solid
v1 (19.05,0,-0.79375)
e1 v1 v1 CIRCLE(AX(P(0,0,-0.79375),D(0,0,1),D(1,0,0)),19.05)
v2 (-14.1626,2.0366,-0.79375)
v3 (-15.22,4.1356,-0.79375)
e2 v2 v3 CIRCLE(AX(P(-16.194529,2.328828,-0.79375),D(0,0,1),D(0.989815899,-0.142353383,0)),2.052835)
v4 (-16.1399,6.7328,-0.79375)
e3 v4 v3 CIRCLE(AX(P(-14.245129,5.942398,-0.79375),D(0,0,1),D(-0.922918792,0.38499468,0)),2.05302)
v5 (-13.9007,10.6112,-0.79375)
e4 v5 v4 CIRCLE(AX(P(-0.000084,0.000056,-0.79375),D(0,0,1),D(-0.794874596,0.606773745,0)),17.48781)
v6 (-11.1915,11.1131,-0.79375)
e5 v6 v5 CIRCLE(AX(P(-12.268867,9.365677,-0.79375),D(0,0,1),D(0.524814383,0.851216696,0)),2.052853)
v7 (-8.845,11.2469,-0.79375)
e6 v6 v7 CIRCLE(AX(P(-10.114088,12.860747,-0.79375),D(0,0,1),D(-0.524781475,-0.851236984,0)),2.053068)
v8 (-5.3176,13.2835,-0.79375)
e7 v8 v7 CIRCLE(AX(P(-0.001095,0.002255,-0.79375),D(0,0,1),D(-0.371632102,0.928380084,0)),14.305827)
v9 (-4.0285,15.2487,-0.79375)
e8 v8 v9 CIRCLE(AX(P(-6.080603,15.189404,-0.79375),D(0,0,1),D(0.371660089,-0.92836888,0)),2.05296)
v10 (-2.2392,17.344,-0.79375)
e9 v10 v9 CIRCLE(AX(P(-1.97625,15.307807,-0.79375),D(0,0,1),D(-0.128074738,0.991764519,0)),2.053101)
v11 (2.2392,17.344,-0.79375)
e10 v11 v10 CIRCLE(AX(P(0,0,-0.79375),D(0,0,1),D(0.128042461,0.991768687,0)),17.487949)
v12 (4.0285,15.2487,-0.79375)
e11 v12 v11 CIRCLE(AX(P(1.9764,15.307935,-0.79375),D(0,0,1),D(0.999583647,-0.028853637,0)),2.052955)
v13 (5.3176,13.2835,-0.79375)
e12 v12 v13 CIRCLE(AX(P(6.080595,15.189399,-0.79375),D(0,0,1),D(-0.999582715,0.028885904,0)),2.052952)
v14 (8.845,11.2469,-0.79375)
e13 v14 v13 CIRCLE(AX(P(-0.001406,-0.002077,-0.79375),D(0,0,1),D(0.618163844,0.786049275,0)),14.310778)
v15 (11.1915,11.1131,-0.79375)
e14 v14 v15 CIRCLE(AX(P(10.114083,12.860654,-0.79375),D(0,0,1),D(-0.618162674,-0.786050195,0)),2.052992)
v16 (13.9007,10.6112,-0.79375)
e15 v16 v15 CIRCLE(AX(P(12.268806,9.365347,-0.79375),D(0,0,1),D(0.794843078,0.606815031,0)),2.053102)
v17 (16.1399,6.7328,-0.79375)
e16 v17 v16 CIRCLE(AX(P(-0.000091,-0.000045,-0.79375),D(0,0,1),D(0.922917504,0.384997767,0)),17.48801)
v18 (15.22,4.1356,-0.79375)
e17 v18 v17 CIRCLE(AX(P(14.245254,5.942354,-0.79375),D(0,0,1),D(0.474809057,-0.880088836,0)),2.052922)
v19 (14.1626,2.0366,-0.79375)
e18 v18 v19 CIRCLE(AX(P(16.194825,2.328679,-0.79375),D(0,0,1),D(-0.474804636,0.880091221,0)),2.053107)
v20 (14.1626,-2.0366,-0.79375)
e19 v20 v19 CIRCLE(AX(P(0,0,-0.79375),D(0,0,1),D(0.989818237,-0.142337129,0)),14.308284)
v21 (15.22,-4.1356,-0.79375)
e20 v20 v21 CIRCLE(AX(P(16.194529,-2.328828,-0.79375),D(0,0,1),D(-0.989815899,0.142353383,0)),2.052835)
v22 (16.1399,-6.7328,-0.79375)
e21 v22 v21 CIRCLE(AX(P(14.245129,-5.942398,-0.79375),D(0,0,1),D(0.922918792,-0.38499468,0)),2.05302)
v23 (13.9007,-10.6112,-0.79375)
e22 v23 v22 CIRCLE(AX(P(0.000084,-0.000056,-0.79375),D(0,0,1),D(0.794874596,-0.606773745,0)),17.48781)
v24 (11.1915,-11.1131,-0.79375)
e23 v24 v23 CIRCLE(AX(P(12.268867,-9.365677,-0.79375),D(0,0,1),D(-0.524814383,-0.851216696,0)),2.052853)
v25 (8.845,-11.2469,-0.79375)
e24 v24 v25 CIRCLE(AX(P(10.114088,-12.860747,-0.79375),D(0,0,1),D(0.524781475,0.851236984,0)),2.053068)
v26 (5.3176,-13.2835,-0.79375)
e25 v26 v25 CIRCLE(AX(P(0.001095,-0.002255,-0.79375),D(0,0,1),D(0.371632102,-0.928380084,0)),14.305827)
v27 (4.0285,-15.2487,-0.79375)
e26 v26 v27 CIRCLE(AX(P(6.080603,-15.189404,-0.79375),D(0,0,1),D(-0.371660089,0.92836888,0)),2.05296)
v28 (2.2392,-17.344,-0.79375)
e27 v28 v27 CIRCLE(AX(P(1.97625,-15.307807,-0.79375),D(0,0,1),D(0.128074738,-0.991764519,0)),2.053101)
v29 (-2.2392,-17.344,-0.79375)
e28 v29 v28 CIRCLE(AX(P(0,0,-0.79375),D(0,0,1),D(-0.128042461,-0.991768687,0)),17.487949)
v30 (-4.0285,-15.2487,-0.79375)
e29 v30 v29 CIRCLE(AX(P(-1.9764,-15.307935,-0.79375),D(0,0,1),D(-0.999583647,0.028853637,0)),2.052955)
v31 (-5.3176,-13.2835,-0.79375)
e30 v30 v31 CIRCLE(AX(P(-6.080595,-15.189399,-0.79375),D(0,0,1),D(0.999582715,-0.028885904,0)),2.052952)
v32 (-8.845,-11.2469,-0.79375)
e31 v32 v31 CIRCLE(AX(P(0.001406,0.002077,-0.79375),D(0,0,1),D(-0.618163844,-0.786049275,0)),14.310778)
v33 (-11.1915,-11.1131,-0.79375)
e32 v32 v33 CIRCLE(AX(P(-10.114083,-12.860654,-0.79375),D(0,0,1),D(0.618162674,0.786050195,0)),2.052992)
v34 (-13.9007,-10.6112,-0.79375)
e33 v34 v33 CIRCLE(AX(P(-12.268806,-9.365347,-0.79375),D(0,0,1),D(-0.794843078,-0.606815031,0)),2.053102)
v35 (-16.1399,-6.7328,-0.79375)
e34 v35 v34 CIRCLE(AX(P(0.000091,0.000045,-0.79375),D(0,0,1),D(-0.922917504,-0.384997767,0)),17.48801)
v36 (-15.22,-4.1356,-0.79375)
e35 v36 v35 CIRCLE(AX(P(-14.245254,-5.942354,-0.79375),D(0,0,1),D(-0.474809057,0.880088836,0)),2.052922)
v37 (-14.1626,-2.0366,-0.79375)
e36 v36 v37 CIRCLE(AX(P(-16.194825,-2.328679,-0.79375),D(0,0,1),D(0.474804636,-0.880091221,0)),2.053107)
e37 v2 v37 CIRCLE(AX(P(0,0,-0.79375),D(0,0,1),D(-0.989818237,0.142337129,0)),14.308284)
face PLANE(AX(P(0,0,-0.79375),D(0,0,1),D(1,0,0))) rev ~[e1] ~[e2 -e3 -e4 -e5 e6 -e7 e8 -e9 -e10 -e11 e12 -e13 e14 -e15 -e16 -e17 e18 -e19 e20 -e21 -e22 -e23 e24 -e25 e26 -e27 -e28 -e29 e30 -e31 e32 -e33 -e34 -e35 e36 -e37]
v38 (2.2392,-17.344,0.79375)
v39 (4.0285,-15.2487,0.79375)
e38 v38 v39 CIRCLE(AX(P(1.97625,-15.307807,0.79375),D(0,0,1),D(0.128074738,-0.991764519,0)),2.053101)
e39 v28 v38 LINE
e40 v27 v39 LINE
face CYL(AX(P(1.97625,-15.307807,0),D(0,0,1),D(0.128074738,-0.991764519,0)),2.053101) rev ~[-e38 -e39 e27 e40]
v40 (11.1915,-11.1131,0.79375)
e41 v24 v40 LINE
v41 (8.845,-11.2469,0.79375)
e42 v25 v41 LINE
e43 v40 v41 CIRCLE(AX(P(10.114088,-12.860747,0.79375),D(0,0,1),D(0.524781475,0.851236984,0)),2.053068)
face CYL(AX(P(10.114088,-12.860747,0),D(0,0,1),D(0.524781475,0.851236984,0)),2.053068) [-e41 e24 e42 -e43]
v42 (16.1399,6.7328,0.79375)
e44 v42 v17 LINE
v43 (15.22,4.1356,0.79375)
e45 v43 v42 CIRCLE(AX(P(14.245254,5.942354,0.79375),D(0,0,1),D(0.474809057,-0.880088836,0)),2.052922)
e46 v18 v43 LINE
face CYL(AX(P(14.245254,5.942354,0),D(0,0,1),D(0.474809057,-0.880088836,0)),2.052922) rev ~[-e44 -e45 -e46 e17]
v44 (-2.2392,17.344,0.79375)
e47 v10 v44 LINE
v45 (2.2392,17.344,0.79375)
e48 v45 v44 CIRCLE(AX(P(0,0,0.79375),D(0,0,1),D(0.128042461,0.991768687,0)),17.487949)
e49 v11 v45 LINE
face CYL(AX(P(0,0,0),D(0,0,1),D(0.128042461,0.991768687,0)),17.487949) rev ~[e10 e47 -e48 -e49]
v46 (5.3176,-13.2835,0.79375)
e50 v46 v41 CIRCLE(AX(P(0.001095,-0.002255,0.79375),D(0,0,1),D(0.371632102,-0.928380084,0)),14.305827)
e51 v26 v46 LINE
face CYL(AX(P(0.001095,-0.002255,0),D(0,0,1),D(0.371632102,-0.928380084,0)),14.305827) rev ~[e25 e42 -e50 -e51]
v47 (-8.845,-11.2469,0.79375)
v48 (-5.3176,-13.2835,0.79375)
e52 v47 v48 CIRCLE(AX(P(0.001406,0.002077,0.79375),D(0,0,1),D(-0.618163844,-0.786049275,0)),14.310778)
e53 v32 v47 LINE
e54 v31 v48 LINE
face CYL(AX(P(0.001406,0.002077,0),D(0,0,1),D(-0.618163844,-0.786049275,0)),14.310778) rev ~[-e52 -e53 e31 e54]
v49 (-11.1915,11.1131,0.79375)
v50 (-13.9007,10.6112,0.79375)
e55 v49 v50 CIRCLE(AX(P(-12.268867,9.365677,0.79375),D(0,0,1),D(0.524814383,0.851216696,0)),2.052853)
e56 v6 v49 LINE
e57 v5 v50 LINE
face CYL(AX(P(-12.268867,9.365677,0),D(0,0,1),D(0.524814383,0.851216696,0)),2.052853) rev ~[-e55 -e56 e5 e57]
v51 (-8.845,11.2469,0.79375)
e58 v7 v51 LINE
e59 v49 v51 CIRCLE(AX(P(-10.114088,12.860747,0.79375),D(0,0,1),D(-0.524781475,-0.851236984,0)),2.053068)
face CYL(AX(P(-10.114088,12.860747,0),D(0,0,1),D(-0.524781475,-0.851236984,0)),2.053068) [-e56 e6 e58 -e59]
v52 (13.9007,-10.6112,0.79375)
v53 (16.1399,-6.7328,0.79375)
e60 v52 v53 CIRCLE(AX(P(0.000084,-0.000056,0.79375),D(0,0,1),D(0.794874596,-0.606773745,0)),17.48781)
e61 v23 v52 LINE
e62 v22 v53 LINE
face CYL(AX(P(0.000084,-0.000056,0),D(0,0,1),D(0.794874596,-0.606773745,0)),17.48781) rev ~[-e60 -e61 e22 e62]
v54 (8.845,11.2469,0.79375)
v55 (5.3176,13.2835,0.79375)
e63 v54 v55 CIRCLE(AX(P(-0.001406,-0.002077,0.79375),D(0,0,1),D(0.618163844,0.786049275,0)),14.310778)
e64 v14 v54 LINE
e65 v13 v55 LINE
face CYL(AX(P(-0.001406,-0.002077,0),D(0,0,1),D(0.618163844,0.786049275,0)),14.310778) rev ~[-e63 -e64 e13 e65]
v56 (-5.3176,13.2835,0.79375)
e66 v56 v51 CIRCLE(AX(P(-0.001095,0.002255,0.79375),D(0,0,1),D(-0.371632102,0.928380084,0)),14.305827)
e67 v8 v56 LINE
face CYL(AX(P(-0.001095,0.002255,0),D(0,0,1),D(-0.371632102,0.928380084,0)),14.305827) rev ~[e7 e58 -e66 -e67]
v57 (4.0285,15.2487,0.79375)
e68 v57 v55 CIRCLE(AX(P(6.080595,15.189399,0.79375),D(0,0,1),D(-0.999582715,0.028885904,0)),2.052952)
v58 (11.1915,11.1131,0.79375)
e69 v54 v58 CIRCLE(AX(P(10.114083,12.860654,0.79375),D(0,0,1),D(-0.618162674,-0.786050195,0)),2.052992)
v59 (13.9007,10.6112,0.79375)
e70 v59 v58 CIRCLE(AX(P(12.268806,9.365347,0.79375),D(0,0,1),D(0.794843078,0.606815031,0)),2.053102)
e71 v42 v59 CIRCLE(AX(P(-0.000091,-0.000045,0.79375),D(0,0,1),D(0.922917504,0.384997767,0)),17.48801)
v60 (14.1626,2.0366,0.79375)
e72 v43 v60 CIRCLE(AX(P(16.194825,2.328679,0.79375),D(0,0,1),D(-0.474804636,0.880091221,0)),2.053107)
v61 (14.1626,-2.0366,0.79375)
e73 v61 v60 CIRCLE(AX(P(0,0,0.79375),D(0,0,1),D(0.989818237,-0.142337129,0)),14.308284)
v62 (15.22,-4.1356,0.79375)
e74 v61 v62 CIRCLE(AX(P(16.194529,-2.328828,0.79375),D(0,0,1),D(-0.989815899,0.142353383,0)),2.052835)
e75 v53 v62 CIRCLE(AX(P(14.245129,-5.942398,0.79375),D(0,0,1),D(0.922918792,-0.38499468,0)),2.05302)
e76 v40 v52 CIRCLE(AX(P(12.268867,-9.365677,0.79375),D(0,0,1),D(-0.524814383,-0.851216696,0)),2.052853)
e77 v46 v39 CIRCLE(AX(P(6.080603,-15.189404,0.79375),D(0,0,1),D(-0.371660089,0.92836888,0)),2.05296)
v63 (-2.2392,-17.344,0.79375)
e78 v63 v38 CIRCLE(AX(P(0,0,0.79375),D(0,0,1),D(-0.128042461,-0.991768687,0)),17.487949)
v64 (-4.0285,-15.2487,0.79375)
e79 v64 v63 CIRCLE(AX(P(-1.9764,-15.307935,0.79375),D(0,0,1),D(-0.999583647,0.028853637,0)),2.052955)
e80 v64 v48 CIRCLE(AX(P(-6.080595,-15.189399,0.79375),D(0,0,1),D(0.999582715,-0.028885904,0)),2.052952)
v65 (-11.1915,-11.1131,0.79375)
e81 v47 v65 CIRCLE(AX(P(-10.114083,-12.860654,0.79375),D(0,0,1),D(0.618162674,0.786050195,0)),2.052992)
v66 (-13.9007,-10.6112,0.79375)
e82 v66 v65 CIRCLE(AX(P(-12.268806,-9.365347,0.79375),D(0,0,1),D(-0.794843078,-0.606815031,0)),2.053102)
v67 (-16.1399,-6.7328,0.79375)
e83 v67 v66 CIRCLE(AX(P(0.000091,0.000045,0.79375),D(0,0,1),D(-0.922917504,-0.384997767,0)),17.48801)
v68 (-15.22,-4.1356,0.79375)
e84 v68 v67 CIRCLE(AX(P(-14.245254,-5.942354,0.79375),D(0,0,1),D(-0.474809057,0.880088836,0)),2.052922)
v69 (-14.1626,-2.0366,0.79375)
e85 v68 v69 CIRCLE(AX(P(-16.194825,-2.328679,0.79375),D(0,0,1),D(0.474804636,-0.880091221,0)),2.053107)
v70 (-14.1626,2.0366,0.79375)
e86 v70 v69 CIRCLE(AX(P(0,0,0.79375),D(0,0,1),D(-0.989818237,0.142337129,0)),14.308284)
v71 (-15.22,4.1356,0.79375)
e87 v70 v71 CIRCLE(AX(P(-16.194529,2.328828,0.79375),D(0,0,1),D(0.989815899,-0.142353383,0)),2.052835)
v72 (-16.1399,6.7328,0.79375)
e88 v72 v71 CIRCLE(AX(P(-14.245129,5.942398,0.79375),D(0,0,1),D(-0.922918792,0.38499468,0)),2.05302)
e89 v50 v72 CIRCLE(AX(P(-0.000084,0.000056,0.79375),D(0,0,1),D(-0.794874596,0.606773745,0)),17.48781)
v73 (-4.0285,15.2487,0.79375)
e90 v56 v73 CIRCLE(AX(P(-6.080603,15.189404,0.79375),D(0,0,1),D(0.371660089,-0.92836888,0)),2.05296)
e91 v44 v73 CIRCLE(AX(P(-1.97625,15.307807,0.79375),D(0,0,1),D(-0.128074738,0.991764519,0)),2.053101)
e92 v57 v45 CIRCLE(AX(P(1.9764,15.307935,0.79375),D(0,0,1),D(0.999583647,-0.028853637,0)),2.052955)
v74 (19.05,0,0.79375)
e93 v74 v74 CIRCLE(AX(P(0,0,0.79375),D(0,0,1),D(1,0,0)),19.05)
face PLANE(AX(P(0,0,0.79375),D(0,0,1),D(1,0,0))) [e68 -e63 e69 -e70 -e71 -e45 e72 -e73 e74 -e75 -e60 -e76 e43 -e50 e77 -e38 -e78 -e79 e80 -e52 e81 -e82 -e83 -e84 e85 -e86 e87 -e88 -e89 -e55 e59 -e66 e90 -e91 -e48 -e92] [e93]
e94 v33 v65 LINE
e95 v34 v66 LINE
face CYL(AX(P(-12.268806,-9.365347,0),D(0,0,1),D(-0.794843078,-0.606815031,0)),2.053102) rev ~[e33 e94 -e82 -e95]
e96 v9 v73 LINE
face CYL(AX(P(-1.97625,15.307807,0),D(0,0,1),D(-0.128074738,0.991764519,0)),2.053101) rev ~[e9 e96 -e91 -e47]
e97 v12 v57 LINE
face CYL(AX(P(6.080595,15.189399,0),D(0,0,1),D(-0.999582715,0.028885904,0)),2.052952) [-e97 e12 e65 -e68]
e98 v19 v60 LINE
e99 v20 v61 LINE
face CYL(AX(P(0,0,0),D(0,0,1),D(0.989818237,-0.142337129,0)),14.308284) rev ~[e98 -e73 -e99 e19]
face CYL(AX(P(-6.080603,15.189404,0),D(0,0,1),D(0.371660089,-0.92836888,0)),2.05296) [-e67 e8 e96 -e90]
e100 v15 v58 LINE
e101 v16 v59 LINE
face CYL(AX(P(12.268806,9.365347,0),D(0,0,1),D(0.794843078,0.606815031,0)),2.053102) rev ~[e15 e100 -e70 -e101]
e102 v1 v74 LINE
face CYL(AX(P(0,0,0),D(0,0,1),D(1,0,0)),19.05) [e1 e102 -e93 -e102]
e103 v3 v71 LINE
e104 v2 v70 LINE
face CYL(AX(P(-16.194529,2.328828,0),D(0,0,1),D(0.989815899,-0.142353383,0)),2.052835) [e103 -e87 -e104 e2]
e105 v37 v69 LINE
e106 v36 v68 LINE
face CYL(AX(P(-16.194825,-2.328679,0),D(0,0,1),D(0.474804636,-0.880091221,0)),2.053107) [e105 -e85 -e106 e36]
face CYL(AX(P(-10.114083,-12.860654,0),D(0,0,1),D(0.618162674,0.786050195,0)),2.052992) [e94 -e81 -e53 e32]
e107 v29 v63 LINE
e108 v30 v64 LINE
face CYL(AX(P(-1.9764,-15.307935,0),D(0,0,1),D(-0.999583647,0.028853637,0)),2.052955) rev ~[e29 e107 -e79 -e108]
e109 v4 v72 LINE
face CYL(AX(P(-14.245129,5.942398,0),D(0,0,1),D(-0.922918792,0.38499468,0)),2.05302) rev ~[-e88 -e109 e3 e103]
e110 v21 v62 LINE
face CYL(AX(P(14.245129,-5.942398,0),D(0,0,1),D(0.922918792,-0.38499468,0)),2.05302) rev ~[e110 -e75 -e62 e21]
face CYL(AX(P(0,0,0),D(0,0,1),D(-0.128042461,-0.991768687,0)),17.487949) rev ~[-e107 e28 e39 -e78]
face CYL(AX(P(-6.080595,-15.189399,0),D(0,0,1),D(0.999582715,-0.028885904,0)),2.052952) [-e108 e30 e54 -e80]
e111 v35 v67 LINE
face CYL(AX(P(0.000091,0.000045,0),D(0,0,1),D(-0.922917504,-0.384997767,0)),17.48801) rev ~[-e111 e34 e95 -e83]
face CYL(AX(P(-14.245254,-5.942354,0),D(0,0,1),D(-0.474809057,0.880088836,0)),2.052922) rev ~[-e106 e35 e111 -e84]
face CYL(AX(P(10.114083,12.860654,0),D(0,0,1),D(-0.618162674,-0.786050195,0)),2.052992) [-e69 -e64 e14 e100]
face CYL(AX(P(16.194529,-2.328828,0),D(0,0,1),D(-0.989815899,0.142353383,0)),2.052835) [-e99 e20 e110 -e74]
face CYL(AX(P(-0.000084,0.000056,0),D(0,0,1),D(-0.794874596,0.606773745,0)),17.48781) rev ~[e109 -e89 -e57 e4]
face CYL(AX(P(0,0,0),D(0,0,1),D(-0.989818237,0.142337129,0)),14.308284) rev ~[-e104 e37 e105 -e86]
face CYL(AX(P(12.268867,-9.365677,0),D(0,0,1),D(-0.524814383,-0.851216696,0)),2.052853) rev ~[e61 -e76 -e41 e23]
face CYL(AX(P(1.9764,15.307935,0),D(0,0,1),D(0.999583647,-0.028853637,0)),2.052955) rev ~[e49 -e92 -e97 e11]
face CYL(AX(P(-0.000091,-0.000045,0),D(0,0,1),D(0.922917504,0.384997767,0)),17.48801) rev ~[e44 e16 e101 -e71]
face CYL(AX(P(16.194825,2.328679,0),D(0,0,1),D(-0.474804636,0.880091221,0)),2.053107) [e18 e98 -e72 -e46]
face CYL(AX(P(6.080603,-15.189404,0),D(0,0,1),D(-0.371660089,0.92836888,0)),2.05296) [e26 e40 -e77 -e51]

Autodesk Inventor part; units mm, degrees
ref_plane "YZ Plane" through (0, 0, 0) normal (1, 0, 0) x (0, 1, 0)
ref_plane "XZ Plane" through (0, 0, 0) normal (0, 1, 0) x (-1, 0, 0)
ref_plane "XY Plane" through (0, 0, 0) normal (0, 0, 1) x (1, 0, 0)
sketch "MAXSpline Spacer Profile" plane through (0, 0, 0) normal (0, 0, 1) x (1, 0, 0)
  circle A0 centre (0, 0) radius 19.05
  arc A1 (15.22, 4.1356) -> (16.1399, 6.7328) centre (14.2452, 5.9424) ccw
  arc A2 (15.22, 4.1356) -> (14.1626, 2.0366) centre (16.1947, 2.3288) ccw
  arc A3 (14.1626, -2.0366) -> (14.1626, 2.0366) centre (0, 0) ccw
  arc A4 (14.1626, -2.0366) -> (15.22, -4.1356) centre (16.1947, -2.3288) ccw
  arc A5 (16.1399, -6.7328) -> (15.22, -4.1356) centre (14.2452, -5.9424) ccw
  arc A6 (13.9007, -10.6112) -> (16.1399, -6.7328) centre (0, 0) ccw
  arc A7 (11.1915, -11.1131) -> (13.9007, -10.6112) centre (12.2689, -9.3655) ccw
  arc A8 (11.1915, -11.1131) -> (8.845, -11.2469) centre (10.1141, -12.8607) ccw
  arc A9 (5.3176, -13.2835) -> (8.845, -11.2469) centre (0, 0) ccw
  arc A10 (5.3176, -13.2835) -> (4.0285, -15.2487) centre (6.0806, -15.1894) ccw
  arc A11 (2.2392, -17.344) -> (4.0285, -15.2487) centre (1.9763, -15.3079) ccw
  arc A12 (-2.2392, -17.344) -> (2.2392, -17.344) centre (0, 0) ccw
  arc A13 (-4.0285, -15.2487) -> (-2.2392, -17.344) centre (-1.9763, -15.3079) ccw
  arc A14 (-4.0285, -15.2487) -> (-5.3176, -13.2835) centre (-6.0806, -15.1894) ccw
  arc A15 (-8.845, -11.2469) -> (-5.3176, -13.2835) centre (0, 0) ccw
  arc A16 (-8.845, -11.2469) -> (-11.1915, -11.1131) centre (-10.1141, -12.8607) ccw
  arc A17 (-13.9007, -10.6112) -> (-11.1915, -11.1131) centre (-12.2689, -9.3655) ccw
  arc A18 (-16.1399, -6.7328) -> (-13.9007, -10.6112) centre (0, 0) ccw
  arc A19 (-15.22, -4.1356) -> (-16.1399, -6.7328) centre (-14.2452, -5.9424) ccw
  arc A20 (-15.22, -4.1356) -> (-14.1626, -2.0366) centre (-16.1947, -2.3288) ccw
  arc A21 (-14.1626, 2.0366) -> (-14.1626, -2.0366) centre (0, 0) ccw
  arc A22 (-14.1626, 2.0366) -> (-15.22, 4.1356) centre (-16.1947, 2.3288) ccw
  arc A23 (-16.1399, 6.7328) -> (-15.22, 4.1356) centre (-14.2452, 5.9424) ccw
  arc A24 (-13.9007, 10.6112) -> (-16.1399, 6.7328) centre (0, 0) ccw
  arc A25 (-11.1915, 11.1131) -> (-13.9007, 10.6112) centre (-12.2689, 9.3655) ccw
  arc A26 (-11.1915, 11.1131) -> (-8.845, 11.2469) centre (-10.1141, 12.8607) ccw
  arc A27 (-5.3176, 13.2835) -> (-8.845, 11.2469) centre (0, 0) ccw
  arc A28 (-5.3176, 13.2835) -> (-4.0285, 15.2487) centre (-6.0806, 15.1894) ccw
  arc A29 (-2.2392, 17.344) -> (-4.0285, 15.2487) centre (-1.9763, 15.3079) ccw
  arc A30 (2.2392, 17.344) -> (-2.2392, 17.344) centre (0, 0) ccw
  arc A31 (4.0285, 15.2487) -> (2.2392, 17.344) centre (1.9763, 15.3079) ccw
  arc A32 (4.0285, 15.2487) -> (5.3176, 13.2835) centre (6.0806, 15.1894) ccw
  arc A33 (8.845, 11.2469) -> (5.3176, 13.2835) centre (0, 0) ccw
  arc A34 (8.845, 11.2469) -> (11.1915, 11.1131) centre (10.1141, 12.8607) ccw
  arc A35 (13.9007, 10.6112) -> (11.1915, 11.1131) centre (12.2689, 9.3655) ccw
  arc A36 (16.1399, 6.7328) -> (13.9007, 10.6112) centre (0, 0) ccw
  arc A37 (17.4067, -2.0716) -> (17.4067, 2.0716) centre (0, 0) ccw
  arc A38 (15.7454, -1.8738) -> (17.4067, -2.0716) centre (16.5761, -1.9727) ccw
  arc A39 (15.7454, -1.8738) -> (15.7454, 1.8738) centre (0, 0) ccw
  arc A40 (17.4067, 2.0716) -> (15.7454, 1.8738) centre (16.5761, 1.9727) ccw
  arc A41 (10.4974, 14.0389) -> (6.9093, 16.1104) centre (0, 0) ccw
  arc A42 (9.4955, 12.699) -> (10.4974, 14.0389) centre (9.9964, 13.3689) ccw
  arc A43 (9.4955, 12.699) -> (6.2499, 14.5728) centre (0, 0) ccw
  arc A44 (6.9093, 16.1104) -> (6.2499, 14.5728) centre (6.5796, 15.3416) ccw
  arc A45 (-6.9093, 16.1104) -> (-10.4974, 14.0389) centre (0, 0) ccw
  arc A46 (-6.2499, 14.5728) -> (-6.9093, 16.1104) centre (-6.5796, 15.3416) ccw
  arc A47 (-6.2499, 14.5728) -> (-9.4955, 12.699) centre (0, 0) ccw
  arc A48 (-10.4974, 14.0389) -> (-9.4955, 12.699) centre (-9.9964, 13.3689) ccw
  arc A49 (-17.4067, 2.0716) -> (-17.4067, -2.0716) centre (0, 0) ccw
  arc A50 (-15.7454, 1.8738) -> (-17.4067, 2.0716) centre (-16.5761, 1.9727) ccw
  arc A51 (-15.7454, 1.8738) -> (-15.7454, -1.8738) centre (0, 0) ccw
  arc A52 (-17.4067, -2.0716) -> (-15.7454, -1.8738) centre (-16.5761, -1.9727) ccw
  arc A53 (-10.4974, -14.0389) -> (-6.9093, -16.1104) centre (0, 0) ccw
  arc A54 (-9.4955, -12.699) -> (-10.4974, -14.0389) centre (-9.9964, -13.3689) ccw
  arc A55 (-9.4955, -12.699) -> (-6.2499, -14.5728) centre (0, 0) ccw
  arc A56 (-6.9093, -16.1104) -> (-6.2499, -14.5728) centre (-6.5796, -15.3416) ccw
  arc A57 (6.9093, -16.1104) -> (10.4974, -14.0389) centre (0, 0) ccw
  arc A58 (6.2499, -14.5728) -> (6.9093, -16.1104) centre (6.5796, -15.3416) ccw
  arc A59 (6.2499, -14.5728) -> (9.4955, -12.699) centre (0, 0) ccw
  arc A60 (10.4974, -14.0389) -> (9.4955, -12.699) centre (9.9964, -13.3689) ccw
  dimension "d0" = 38.1
sketch "Sketch1" plane through (0, 0, 0) normal (0, 0, 1) x (1, 0, 0)
  circle A0 centre (0, 0) radius 19.05
  arc A1 (15.22, 4.1356) -> (16.1399, 6.7328) centre (14.2452, 5.9424) ccw
  arc A2 (15.22, 4.1356) -> (14.1626, 2.0366) centre (16.1947, 2.3288) ccw
  arc A3 (14.1626, -2.0366) -> (14.1626, 2.0366) centre (0, 0) ccw
  arc A4 (14.1626, -2.0366) -> (15.22, -4.1356) centre (16.1947, -2.3288) ccw
  arc A5 (16.1399, -6.7328) -> (15.22, -4.1356) centre (14.2452, -5.9424) ccw
  arc A6 (13.9007, -10.6112) -> (16.1399, -6.7328) centre (0, 0) ccw
  arc A7 (11.1915, -11.1131) -> (13.9007, -10.6112) centre (12.2689, -9.3655) ccw
  arc A8 (11.1915, -11.1131) -> (8.845, -11.2469) centre (10.1141, -12.8607) ccw
  arc A9 (5.3176, -13.2835) -> (8.845, -11.2469) centre (0, 0) ccw
  arc A10 (5.3176, -13.2835) -> (4.0285, -15.2487) centre (6.0806, -15.1894) ccw
  arc A11 (2.2392, -17.344) -> (4.0285, -15.2487) centre (1.9763, -15.3079) ccw
  arc A12 (-2.2392, -17.344) -> (2.2392, -17.344) centre (0, 0) ccw
  arc A13 (-4.0285, -15.2487) -> (-2.2392, -17.344) centre (-1.9763, -15.3079) ccw
  arc A14 (-4.0285, -15.2487) -> (-5.3176, -13.2835) centre (-6.0806, -15.1894) ccw
  arc A15 (-8.845, -11.2469) -> (-5.3176, -13.2835) centre (0, 0) ccw
  arc A16 (-8.845, -11.2469) -> (-11.1915, -11.1131) centre (-10.1141, -12.8607) ccw
  arc A17 (-13.9007, -10.6112) -> (-11.1915, -11.1131) centre (-12.2689, -9.3655) ccw
  arc A18 (-16.1399, -6.7328) -> (-13.9007, -10.6112) centre (0, 0) ccw
  arc A19 (-15.22, -4.1356) -> (-16.1399, -6.7328) centre (-14.2452, -5.9424) ccw
  arc A20 (-15.22, -4.1356) -> (-14.1626, -2.0366) centre (-16.1947, -2.3288) ccw
  arc A21 (-14.1626, 2.0366) -> (-14.1626, -2.0366) centre (0, 0) ccw
  arc A22 (-14.1626, 2.0366) -> (-15.22, 4.1356) centre (-16.1947, 2.3288) ccw
  arc A23 (-16.1399, 6.7328) -> (-15.22, 4.1356) centre (-14.2452, 5.9424) ccw
  arc A24 (-13.9007, 10.6112) -> (-16.1399, 6.7328) centre (0, 0) ccw
  arc A25 (-11.1915, 11.1131) -> (-13.9007, 10.6112) centre (-12.2689, 9.3655) ccw
  arc A26 (-11.1915, 11.1131) -> (-8.845, 11.2469) centre (-10.1141, 12.8607) ccw
  arc A27 (-5.3176, 13.2835) -> (-8.845, 11.2469) centre (0, 0) ccw
  arc A28 (-5.3176, 13.2835) -> (-4.0285, 15.2487) centre (-6.0806, 15.1894) ccw
  arc A29 (-2.2392, 17.344) -> (-4.0285, 15.2487) centre (-1.9763, 15.3079) ccw
  arc A30 (2.2392, 17.344) -> (-2.2392, 17.344) centre (0, 0) ccw
  arc A31 (4.0285, 15.2487) -> (2.2392, 17.344) centre (1.9763, 15.3079) ccw
  arc A32 (4.0285, 15.2487) -> (5.3176, 13.2835) centre (6.0806, 15.1894) ccw
  arc A33 (8.845, 11.2469) -> (5.3176, 13.2835) centre (0, 0) ccw
  arc A34 (8.845, 11.2469) -> (11.1915, 11.1131) centre (10.1141, 12.8607) ccw
  arc A35 (13.9007, 10.6112) -> (11.1915, 11.1131) centre (12.2689, 9.3655) ccw
  arc A36 (16.1399, 6.7328) -> (13.9007, 10.6112) centre (0, 0) ccw
  arc A37 (17.4067, -2.0716) -> (17.4067, 2.0716) centre (0, 0) ccw
  arc A38 (15.7454, -1.8738) -> (17.4067, -2.0716) centre (16.5761, -1.9727) ccw
  arc A39 (15.7454, -1.8738) -> (15.7454, 1.8738) centre (0, 0) ccw
  arc A40 (17.4067, 2.0716) -> (15.7454, 1.8738) centre (16.5761, 1.9727) ccw
  arc A41 (10.4974, 14.0389) -> (6.9093, 16.1104) centre (0, 0) ccw
  arc A42 (9.4955, 12.699) -> (10.4974, 14.0389) centre (9.9964, 13.3689) ccw
  arc A43 (9.4955, 12.699) -> (6.2499, 14.5728) centre (0, 0) ccw
  arc A44 (6.9093, 16.1104) -> (6.2499, 14.5728) centre (6.5796, 15.3416) ccw
  arc A45 (-6.9093, 16.1104) -> (-10.4974, 14.0389) centre (0, 0) ccw
  arc A46 (-6.2499, 14.5728) -> (-6.9093, 16.1104) centre (-6.5796, 15.3416) ccw
  arc A47 (-6.2499, 14.5728) -> (-9.4955, 12.699) centre (0, 0) ccw
  arc A48 (-10.4974, 14.0389) -> (-9.4955, 12.699) centre (-9.9964, 13.3689) ccw
  arc A49 (-17.4067, 2.0716) -> (-17.4067, -2.0716) centre (0, 0) ccw
  arc A50 (-15.7454, 1.8738) -> (-17.4067, 2.0716) centre (-16.5761, 1.9727) ccw
  arc A51 (-15.7454, 1.8738) -> (-15.7454, -1.8738) centre (0, 0) ccw
  arc A52 (-17.4067, -2.0716) -> (-15.7454, -1.8738) centre (-16.5761, -1.9727) ccw
  arc A53 (-10.4974, -14.0389) -> (-6.9093, -16.1104) centre (0, 0) ccw
  arc A54 (-9.4955, -12.699) -> (-10.4974, -14.0389) centre (-9.9964, -13.3689) ccw
  arc A55 (-9.4955, -12.699) -> (-6.2499, -14.5728) centre (0, 0) ccw
  arc A56 (-6.9093, -16.1104) -> (-6.2499, -14.5728) centre (-6.5796, -15.3416) ccw
  arc A57 (6.9093, -16.1104) -> (10.4974, -14.0389) centre (0, 0) ccw
  arc A58 (6.2499, -14.5728) -> (6.9093, -16.1104) centre (6.5796, -15.3416) ccw
  arc A59 (6.2499, -14.5728) -> (9.4955, -12.699) centre (0, 0) ccw
  arc A60 (10.4974, -14.0389) -> (9.4955, -12.699) centre (9.9964, -13.3689) ccw
extrude "Extrusion1" add sketch "Sketch1" along normal mid plane 1.5875 contours A0 | A38 A39 A40 A37 | A42 A43 A44 A41 | A46 A47 A48 A45 | A50 A51 A52 A49 | A54 A55 A56 A53 | A58 A59 A60 A57
extrude "Extrusion2" [suppressed]
fillet "Fillet1" [suppressed]
mirror "Mirror1" [suppressed]
properties part number "MAXSpline Spacers" material "Acetal Resin, Black"
